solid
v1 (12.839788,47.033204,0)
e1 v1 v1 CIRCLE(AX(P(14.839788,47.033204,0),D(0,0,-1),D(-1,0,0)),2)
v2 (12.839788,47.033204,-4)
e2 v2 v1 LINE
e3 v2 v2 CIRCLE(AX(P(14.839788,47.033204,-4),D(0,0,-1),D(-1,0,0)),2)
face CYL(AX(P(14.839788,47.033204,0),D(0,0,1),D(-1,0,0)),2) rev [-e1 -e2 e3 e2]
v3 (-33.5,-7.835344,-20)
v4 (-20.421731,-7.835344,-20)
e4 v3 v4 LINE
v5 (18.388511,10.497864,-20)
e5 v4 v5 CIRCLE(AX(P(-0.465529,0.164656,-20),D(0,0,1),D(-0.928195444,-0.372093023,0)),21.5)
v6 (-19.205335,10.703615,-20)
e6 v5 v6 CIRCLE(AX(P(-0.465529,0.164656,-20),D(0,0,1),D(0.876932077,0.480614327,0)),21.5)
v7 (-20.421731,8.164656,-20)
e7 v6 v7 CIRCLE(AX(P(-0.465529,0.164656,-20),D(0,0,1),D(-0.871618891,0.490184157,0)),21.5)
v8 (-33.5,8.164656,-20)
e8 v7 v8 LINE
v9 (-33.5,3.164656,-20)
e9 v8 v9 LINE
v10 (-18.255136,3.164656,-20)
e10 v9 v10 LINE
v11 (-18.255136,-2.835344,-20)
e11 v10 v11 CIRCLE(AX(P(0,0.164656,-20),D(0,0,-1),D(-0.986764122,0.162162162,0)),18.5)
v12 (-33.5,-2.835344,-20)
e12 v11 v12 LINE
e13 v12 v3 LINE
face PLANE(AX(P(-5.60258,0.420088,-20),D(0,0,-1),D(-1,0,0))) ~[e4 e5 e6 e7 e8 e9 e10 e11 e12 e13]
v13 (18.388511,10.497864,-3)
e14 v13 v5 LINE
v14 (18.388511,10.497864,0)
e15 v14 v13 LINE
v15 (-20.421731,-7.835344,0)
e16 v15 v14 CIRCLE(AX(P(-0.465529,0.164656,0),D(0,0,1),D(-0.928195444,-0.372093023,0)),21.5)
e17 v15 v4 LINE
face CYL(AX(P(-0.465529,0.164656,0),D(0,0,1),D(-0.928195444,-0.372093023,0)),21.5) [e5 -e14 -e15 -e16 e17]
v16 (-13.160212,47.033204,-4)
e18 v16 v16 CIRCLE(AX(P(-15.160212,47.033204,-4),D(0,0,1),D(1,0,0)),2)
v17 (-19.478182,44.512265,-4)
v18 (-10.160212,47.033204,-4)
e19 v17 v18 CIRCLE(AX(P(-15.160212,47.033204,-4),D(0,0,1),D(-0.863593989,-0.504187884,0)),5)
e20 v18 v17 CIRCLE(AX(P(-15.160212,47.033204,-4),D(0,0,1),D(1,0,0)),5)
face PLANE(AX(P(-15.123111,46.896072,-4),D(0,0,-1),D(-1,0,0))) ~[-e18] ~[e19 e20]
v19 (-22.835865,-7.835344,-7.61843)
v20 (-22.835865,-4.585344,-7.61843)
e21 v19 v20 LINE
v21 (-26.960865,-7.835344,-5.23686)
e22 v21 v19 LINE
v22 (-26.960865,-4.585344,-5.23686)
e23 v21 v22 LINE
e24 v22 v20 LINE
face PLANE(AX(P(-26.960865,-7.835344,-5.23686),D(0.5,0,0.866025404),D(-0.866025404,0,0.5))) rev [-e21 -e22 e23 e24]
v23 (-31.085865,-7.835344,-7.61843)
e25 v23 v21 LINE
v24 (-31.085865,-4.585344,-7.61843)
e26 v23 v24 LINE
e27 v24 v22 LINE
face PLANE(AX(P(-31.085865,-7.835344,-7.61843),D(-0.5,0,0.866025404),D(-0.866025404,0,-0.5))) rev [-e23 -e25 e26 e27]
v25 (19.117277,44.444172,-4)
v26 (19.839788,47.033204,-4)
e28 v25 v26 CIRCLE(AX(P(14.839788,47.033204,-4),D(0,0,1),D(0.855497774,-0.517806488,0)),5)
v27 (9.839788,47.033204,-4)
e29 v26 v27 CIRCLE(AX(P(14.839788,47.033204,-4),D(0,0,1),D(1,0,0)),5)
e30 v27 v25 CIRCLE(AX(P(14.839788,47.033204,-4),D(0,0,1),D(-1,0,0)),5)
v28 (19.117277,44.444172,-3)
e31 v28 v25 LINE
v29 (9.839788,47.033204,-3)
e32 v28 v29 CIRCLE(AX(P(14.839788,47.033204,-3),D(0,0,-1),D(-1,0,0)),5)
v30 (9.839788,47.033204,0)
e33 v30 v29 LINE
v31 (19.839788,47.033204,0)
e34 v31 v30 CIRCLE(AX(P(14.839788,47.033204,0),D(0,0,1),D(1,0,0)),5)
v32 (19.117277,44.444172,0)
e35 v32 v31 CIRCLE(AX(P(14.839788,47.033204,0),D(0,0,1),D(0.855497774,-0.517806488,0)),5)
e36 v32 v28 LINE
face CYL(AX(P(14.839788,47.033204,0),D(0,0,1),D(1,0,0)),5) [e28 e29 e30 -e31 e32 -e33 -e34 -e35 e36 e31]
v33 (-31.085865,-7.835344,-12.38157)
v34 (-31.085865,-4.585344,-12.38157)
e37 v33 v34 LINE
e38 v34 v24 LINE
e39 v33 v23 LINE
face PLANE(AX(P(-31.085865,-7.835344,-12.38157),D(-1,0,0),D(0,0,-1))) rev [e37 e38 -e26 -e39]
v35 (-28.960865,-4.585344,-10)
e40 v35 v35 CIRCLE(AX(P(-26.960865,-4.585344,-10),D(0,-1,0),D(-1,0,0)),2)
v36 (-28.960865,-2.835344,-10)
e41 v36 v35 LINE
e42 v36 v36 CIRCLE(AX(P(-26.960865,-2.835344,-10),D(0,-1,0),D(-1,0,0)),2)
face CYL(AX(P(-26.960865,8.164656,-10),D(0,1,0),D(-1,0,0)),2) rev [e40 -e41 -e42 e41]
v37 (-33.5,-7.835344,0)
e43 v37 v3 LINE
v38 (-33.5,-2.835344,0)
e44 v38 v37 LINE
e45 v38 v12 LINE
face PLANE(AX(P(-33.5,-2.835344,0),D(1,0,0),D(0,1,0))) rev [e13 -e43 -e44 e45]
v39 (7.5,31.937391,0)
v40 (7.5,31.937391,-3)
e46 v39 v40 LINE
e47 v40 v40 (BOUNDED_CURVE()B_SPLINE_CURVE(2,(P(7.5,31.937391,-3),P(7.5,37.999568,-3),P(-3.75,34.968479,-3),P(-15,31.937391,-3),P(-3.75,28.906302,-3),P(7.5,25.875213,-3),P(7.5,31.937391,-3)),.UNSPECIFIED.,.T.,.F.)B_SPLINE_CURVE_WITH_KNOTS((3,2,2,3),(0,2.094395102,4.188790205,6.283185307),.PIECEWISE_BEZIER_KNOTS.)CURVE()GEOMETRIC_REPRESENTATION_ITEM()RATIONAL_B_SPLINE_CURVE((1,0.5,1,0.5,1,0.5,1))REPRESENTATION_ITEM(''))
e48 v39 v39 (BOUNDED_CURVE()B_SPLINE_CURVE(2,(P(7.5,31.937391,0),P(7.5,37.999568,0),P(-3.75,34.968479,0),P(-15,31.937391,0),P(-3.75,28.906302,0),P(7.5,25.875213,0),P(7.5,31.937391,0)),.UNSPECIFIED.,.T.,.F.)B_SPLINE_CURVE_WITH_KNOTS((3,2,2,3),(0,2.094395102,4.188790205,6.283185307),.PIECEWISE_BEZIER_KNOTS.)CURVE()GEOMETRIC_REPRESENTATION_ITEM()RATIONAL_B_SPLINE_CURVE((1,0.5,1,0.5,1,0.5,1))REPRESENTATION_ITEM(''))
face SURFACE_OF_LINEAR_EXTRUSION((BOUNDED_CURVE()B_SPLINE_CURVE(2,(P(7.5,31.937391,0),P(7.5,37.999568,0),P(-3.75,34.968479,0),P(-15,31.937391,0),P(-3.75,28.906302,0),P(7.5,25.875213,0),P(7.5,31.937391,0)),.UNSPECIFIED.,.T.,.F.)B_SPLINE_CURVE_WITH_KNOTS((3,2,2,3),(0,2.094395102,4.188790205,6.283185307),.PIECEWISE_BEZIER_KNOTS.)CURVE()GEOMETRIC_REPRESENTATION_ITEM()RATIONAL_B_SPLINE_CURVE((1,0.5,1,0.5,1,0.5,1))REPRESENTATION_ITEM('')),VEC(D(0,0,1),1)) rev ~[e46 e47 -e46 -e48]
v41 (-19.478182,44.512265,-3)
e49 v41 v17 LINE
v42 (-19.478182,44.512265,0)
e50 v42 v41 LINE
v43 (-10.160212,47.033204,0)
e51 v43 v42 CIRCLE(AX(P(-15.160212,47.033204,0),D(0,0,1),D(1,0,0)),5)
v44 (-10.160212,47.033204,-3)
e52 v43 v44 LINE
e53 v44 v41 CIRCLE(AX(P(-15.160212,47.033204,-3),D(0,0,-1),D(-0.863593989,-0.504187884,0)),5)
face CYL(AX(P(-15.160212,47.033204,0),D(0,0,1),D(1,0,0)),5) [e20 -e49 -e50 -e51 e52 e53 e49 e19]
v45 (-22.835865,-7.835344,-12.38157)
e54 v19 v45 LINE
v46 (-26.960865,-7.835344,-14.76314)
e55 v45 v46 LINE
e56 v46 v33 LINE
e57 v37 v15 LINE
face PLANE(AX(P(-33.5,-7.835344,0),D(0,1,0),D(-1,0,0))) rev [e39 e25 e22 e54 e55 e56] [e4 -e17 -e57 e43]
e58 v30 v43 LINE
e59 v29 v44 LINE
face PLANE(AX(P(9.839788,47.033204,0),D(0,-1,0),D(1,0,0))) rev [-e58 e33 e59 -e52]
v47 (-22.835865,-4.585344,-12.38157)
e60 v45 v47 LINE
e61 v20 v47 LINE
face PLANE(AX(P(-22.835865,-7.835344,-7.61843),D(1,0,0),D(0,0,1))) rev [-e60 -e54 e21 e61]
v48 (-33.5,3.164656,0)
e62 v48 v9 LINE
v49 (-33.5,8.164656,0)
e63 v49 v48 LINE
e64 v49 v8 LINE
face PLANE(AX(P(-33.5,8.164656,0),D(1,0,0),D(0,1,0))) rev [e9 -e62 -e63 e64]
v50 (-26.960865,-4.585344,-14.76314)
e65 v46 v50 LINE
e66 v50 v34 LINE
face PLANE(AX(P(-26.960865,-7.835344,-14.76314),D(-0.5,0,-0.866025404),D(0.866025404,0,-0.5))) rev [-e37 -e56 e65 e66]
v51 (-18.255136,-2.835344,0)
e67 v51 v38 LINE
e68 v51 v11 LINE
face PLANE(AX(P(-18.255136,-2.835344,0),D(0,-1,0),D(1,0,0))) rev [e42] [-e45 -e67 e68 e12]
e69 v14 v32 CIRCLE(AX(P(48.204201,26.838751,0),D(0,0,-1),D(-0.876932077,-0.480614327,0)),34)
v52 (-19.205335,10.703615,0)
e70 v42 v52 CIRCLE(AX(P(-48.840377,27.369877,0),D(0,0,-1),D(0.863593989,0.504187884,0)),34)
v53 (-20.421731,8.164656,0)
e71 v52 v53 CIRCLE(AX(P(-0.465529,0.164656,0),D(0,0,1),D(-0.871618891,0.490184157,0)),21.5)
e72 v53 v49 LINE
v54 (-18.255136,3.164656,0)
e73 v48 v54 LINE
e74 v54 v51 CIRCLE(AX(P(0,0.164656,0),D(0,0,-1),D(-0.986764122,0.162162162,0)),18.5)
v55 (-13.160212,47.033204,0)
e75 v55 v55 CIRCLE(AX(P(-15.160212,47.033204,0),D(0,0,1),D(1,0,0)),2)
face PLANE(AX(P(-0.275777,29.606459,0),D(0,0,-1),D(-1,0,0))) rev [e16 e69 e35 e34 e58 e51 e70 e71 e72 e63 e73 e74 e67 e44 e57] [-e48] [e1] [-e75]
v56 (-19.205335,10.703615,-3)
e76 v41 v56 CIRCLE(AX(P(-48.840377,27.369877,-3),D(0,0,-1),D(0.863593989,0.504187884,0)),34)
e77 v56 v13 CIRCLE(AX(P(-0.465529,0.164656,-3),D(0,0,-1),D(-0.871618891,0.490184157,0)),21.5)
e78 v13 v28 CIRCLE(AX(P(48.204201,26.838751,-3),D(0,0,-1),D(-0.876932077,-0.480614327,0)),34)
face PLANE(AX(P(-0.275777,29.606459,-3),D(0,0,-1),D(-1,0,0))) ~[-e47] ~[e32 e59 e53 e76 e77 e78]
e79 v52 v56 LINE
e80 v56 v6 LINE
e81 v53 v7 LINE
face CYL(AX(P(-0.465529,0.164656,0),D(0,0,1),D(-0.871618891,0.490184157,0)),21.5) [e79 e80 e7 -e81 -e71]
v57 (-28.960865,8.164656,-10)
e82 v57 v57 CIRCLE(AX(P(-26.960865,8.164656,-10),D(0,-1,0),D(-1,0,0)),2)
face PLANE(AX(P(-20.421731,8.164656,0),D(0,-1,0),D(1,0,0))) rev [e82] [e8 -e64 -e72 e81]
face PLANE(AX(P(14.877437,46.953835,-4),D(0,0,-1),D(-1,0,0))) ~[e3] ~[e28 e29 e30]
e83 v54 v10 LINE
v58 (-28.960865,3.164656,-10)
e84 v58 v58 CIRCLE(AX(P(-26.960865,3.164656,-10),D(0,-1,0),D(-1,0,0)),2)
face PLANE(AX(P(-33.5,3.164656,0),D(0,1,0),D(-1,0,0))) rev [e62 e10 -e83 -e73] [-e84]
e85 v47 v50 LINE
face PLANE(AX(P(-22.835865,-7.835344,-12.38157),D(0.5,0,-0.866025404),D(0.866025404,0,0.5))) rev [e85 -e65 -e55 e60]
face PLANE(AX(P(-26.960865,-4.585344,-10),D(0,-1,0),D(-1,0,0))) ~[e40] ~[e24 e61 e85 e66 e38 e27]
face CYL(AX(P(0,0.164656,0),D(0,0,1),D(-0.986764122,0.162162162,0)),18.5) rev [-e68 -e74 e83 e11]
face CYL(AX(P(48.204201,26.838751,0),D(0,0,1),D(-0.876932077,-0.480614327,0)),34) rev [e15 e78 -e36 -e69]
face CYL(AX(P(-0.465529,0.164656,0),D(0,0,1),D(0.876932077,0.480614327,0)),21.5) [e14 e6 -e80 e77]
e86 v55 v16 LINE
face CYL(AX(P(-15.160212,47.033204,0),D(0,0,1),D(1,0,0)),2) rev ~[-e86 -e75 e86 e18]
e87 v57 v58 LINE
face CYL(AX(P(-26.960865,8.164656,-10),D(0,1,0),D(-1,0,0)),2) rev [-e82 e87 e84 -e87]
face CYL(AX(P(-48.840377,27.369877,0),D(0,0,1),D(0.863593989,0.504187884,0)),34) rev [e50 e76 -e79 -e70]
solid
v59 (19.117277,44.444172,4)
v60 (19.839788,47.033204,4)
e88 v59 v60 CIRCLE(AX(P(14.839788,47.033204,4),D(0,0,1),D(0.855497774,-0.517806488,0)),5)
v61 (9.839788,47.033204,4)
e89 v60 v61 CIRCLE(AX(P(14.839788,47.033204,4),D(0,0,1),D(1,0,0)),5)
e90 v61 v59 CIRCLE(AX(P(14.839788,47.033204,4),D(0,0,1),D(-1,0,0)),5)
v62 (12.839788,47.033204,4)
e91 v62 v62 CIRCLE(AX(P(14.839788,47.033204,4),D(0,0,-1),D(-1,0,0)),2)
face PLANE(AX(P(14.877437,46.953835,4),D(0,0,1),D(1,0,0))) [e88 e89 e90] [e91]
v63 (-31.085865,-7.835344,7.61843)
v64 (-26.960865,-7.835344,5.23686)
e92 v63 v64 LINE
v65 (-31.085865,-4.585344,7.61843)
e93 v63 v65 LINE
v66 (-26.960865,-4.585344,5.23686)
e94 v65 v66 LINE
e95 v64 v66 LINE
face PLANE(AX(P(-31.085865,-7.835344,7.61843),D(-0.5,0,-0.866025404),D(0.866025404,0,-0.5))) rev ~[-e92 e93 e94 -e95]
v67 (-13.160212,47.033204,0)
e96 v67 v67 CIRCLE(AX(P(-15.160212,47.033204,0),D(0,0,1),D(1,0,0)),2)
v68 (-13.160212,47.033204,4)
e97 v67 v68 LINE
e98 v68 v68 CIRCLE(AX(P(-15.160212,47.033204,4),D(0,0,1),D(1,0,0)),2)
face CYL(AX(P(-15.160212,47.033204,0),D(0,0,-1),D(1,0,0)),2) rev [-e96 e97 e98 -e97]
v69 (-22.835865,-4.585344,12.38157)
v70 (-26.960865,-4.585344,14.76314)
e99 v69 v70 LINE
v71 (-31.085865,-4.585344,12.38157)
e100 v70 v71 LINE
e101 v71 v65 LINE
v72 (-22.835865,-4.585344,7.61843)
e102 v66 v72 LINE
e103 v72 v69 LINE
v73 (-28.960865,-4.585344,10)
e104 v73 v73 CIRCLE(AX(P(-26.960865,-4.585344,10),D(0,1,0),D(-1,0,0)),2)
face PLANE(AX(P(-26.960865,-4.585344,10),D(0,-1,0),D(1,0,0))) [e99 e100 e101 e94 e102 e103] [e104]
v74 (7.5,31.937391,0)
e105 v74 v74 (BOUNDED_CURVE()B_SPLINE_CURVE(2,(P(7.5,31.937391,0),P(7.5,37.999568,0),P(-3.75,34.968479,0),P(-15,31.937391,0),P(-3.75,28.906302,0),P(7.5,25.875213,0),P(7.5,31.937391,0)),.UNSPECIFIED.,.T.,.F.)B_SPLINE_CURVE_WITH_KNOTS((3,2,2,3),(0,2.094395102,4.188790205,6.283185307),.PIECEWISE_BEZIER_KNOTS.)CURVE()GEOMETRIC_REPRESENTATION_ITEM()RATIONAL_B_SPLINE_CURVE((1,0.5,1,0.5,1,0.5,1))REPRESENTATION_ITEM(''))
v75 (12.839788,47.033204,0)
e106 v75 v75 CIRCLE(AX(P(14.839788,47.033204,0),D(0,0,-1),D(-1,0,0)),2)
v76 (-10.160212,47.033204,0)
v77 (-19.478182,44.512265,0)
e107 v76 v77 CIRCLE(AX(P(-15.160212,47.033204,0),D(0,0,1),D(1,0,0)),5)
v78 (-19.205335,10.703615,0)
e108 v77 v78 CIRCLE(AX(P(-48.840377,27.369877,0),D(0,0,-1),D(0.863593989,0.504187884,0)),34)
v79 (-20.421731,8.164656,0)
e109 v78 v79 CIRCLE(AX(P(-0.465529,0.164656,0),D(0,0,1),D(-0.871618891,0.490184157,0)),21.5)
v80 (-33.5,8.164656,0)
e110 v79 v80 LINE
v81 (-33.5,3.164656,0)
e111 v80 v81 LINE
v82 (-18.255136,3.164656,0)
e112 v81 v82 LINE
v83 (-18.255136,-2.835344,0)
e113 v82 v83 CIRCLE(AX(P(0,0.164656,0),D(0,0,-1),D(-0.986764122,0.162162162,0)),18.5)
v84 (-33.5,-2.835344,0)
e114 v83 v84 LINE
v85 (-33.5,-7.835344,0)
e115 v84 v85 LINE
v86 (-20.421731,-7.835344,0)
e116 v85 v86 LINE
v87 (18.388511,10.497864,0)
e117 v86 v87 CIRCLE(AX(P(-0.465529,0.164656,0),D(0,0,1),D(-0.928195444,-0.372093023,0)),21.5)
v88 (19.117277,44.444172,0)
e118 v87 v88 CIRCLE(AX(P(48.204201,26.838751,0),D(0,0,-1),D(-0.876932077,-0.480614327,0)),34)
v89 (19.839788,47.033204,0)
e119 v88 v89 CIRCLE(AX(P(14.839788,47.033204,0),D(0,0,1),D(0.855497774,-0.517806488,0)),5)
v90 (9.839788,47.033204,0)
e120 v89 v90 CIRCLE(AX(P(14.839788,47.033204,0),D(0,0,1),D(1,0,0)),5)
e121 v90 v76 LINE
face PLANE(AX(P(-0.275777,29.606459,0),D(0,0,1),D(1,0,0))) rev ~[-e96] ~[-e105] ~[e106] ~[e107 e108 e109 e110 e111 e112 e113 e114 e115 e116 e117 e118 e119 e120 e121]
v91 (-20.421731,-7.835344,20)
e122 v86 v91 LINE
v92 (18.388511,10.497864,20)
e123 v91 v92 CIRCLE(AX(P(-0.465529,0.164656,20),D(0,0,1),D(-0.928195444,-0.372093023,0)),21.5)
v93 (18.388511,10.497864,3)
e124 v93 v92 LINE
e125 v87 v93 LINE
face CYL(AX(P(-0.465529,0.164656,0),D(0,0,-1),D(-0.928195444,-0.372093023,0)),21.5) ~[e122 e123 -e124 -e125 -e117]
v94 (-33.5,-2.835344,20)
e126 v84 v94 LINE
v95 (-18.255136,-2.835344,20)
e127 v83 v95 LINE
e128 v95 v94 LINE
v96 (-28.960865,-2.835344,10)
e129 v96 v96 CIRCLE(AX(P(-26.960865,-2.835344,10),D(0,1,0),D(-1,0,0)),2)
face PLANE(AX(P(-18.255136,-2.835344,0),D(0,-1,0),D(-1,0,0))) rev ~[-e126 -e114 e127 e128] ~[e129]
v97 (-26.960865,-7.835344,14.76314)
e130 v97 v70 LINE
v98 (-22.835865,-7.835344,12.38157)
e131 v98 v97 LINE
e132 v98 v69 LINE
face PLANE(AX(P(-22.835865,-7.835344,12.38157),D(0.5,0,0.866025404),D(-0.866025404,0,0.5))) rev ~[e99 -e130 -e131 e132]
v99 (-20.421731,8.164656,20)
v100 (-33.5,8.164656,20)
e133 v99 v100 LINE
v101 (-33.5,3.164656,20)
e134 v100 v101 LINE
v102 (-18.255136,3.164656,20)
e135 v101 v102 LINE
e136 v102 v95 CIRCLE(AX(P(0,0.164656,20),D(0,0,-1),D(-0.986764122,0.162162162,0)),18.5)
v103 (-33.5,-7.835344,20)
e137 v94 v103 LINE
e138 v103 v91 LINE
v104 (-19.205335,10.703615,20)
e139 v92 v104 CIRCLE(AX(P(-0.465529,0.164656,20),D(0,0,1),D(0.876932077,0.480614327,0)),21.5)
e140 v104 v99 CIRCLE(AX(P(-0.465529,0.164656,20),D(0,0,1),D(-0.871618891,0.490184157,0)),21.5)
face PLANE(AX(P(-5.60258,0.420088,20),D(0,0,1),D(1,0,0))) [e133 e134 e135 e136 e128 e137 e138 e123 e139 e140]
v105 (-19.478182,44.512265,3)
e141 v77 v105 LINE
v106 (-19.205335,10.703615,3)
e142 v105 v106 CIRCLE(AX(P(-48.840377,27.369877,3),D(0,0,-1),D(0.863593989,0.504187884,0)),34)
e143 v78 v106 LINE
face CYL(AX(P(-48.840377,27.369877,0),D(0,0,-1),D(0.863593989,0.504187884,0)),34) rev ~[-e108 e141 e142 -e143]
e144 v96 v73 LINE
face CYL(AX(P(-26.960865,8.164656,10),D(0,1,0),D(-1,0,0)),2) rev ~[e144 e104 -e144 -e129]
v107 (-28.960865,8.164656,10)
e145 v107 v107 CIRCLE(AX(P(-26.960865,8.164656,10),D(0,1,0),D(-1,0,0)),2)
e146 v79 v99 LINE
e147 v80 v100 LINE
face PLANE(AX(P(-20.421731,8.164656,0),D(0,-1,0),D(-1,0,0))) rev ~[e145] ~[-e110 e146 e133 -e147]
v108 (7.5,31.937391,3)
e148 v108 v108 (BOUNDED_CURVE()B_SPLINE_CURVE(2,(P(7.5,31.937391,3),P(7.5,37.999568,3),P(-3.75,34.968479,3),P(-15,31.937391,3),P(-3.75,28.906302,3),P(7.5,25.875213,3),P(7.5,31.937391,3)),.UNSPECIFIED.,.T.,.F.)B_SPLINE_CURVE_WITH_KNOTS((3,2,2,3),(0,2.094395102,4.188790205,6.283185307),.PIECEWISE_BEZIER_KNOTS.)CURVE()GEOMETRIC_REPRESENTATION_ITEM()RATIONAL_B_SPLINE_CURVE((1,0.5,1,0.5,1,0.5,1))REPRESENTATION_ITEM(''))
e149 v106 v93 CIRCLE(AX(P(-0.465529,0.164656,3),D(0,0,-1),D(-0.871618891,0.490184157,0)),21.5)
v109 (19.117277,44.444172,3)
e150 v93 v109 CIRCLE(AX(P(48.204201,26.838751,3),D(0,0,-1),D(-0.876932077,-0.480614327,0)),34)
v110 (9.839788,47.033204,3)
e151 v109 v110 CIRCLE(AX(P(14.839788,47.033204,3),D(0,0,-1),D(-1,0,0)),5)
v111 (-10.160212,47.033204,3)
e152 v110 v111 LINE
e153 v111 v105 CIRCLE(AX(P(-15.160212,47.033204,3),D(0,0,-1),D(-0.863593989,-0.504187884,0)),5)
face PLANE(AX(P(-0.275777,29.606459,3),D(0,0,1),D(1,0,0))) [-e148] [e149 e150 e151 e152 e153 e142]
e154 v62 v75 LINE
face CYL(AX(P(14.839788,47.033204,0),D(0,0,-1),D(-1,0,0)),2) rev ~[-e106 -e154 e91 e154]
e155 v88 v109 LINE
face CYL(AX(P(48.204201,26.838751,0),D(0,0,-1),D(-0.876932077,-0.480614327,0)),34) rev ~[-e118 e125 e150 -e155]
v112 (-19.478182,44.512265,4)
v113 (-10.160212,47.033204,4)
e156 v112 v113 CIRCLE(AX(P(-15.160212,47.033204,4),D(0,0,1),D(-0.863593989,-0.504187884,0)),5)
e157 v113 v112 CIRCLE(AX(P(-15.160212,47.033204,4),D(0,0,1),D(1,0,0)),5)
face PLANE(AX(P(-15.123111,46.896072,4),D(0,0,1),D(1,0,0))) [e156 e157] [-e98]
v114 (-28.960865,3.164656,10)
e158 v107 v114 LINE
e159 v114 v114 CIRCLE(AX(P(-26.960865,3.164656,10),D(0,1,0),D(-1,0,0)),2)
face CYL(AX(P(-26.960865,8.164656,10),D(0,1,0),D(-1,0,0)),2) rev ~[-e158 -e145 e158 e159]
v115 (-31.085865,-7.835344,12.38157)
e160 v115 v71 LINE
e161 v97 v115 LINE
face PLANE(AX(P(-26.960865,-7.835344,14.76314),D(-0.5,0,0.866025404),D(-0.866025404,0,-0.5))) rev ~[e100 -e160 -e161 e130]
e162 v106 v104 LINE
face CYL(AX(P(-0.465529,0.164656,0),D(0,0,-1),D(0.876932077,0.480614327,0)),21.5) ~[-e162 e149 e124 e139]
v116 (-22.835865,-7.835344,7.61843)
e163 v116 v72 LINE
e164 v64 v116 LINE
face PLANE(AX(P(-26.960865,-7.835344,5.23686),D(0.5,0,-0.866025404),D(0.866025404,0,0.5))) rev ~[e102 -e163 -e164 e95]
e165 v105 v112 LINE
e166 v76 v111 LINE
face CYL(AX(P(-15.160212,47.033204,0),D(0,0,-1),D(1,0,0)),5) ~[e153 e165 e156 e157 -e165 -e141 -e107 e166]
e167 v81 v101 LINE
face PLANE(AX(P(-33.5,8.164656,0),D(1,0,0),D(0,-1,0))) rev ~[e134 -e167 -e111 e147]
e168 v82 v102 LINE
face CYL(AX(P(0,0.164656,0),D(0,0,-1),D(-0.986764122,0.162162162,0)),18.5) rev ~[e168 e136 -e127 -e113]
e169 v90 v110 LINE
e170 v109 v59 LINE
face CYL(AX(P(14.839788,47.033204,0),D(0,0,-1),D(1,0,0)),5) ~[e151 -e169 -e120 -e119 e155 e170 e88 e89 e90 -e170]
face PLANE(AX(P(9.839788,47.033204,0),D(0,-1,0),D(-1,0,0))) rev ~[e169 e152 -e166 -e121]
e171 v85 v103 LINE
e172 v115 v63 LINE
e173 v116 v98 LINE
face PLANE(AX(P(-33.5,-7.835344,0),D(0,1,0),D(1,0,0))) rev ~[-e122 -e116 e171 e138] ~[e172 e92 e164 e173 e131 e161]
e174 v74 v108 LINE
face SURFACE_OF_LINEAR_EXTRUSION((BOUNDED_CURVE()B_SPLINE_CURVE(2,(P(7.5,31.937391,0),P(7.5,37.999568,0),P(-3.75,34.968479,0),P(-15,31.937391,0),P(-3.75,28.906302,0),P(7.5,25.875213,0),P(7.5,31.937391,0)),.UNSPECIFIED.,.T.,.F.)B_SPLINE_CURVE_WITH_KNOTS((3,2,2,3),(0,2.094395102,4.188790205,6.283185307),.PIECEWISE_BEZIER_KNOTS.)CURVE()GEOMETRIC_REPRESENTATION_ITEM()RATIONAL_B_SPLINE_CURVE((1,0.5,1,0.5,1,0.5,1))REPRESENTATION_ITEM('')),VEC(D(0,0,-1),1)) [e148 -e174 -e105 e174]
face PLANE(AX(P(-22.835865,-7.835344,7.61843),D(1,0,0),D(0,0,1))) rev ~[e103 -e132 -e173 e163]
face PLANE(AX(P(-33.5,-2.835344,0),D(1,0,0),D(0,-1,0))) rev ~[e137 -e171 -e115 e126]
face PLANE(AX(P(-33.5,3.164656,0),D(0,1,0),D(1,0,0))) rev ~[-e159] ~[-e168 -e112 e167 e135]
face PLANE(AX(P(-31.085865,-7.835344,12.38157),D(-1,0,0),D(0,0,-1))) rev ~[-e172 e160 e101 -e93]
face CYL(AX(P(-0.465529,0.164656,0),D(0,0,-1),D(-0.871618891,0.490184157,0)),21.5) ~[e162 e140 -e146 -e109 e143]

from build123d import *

# Parameters (mm, degrees)
F1_DEPTH = 20
F0_R     = 2
F2_DEPTH = 3
F3_DEPTH = 4
F5_DEPTH = 3.25
F6_R     = 2
F7_DEPTH = 29.5010001


# Not quite as in the source:
# - a feature names something its author has since deleted; it is built from what else it names


with BuildPart() as f1:
    # F0 (on Top) → F1 (new body)
    with BuildSketch(Plane.XY):
        with BuildLine():
            ThreePointArc((-18.2551362635, 3.1646558729), (18.5, 0.1646558729), (-18.2551362635, -2.8353441271))
            Line((-18.2551362635, -2.8353441271), (-21.289668856, -2.8353441271))
            Line((-21.289668856, -2.8353441271), (-33.5, -2.8353441271))
            Line((-33.5, -2.8353441271), (-33.5, -5.8353441271))
            Line((-33.5, -5.8353441271), (-33.5, -7.8353441271))
            Line((-33.5, -7.8353441271), (-20.4217309456, -7.8353441271))
            ThreePointArc((-20.4217309456, -7.8353441271), (8.7176252261, -19.2755005117), (18.3885107603, 10.4978639134))
            ThreePointArc((18.3885107603, 10.4978639134), (-0.3478610365, 21.6643338769), (-19.2053350681, 10.7036152553))
            ThreePointArc((-19.2053350681, 10.7036152553), (-19.8551354356, 9.4540669672), (-20.4217309456, 8.1646558729))
            Line((-20.4217309456, 8.1646558729), (-33.5, 8.1646558729))
            Line((-33.5, 8.1646558729), (-33.5, 6.1646558729))
            Line((-33.5, 6.1646558729), (-33.5, 3.1646558729))
            Line((-33.5, 3.1646558729), (-21.289668856, 3.1646558729))
            Line((-21.289668856, 3.1646558729), (-18.2551362635, 3.1646558729))
        make_face()
    extrude(amount=F1_DEPTH)

    # F0 (on Top) → F2 (join)
    with BuildSketch(Plane.XY):
        with BuildLine():
            ThreePointArc((-19.2053350681, 10.7036152553), (-0.3478610365, 21.6643338769), (18.3885107603, 10.4978639134))
            ThreePointArc((18.3885107603, 10.4978639134), (14.2120337074, 27.5685018888), (19.1172770705, 44.4441716239))
            ThreePointArc((19.1172770705, 44.4441716239), (13.4958098431, 42.2172179553), (9.8397882001, 47.0332040616))
            Line((9.8397882001, 47.0332040616), (-10.1602117999, 47.0332040616))
            ThreePointArc((-10.1602117999, 47.0332040616), (-13.8544265436, 42.2067224379), (-19.4781817457, 44.512264644))
            ThreePointArc((-19.4781817457, 44.512264644), (-14.8414845345, 27.6442586076), (-19.2053350681, 10.7036152553))
        make_face()
        with BuildLine():
            add(Edge.make_bspline(
                [(7.5, 31.9373905659), (7.5, 37.9995683924), (-3.75, 34.9684794791), (-15, 31.9373905659), (-3.75, 28.9063016526), (7.5, 25.8752127394), (7.5, 31.9373905659)],
                knots=[0, 0, 0, 2.0943951024, 2.0943951024, 4.1887902048, 4.1887902048, 6.2831853072, 6.2831853072, 6.2831853072], degree=2, weights=[1, 0.5, 1, 0.5, 1, 0.5, 1]))
        make_face(mode=Mode.SUBTRACT)
        with BuildLine():
            ThreePointArc((-10.1602117999, 47.0332040616), (-16.4659970562, 51.8596856854), (-19.4781817457, 44.512264644))
            ThreePointArc((-19.4781817457, 44.512264644), (-13.8544265436, 42.2067224379), (-10.1602117999, 47.0332040616))
        make_face()
        with Locations((-15.1602117999, 47.0332040616)):
            Circle(F0_R, mode=Mode.SUBTRACT)
        with BuildLine():
            ThreePointArc((9.8397882001, 47.0332040616), (13.4958098431, 42.2172179553), (19.1172770705, 44.4441716239))
            ThreePointArc((19.1172770705, 44.4441716239), (19.6557743064, 45.6892257046), (19.8397882001, 47.0332040616))
            ThreePointArc((19.8397882001, 47.0332040616), (14.8397882001, 52.0332040616), (9.8397882001, 47.0332040616))
        make_face()
        with BuildLine():
            ThreePointArc((16.8397882001, 47.0332040616), (14.8397882001, 45.0332040616), (12.8397882001, 47.0332040616))
            ThreePointArc((12.8397882001, 47.0332040616), (14.8397882001, 49.0332040616), (16.8397882001, 47.0332040616))
        make_face(mode=Mode.SUBTRACT)
    extrude(amount=F2_DEPTH)

    # F0 (on Top) → F3 (join)
    with BuildSketch(Plane.XY):
        with BuildLine():
            ThreePointArc((-10.1602117999, 47.0332040616), (-16.4659970562, 51.8596856854), (-19.4781817457, 44.512264644))
            ThreePointArc((-19.4781817457, 44.512264644), (-13.8544265436, 42.2067224379), (-10.1602117999, 47.0332040616))
        make_face()
        with Locations((-15.1602117999, 47.0332040616)):
            Circle(F0_R, mode=Mode.SUBTRACT)
        with BuildLine():
            ThreePointArc((9.8397882001, 47.0332040616), (13.4958098431, 42.2172179553), (19.1172770705, 44.4441716239))
            ThreePointArc((19.1172770705, 44.4441716239), (19.6557743064, 45.6892257046), (19.8397882001, 47.0332040616))
            ThreePointArc((19.8397882001, 47.0332040616), (14.8397882001, 52.0332040616), (9.8397882001, 47.0332040616))
        make_face()
        with BuildLine():
            ThreePointArc((16.8397882001, 47.0332040616), (14.8397882001, 45.0332040616), (12.8397882001, 47.0332040616))
            ThreePointArc((12.8397882001, 47.0332040616), (14.8397882001, 49.0332040616), (16.8397882001, 47.0332040616))
        make_face(mode=Mode.SUBTRACT)
    extrude(amount=F3_DEPTH)

    # F4 (on face) → F5 (cut)
    with BuildSketch(Plane.XZ.offset(7.8353441271)):
        Polygon((-31.0858654728, 12.3815698604), (-31.0858654728, 7.6184301396), (-26.9608654728, 5.2368602792), (-22.8358654728, 7.6184301396), (-22.8358654728, 12.3815698604), (-26.9608654728, 14.7631397208), align=None)
    extrude(amount=-F5_DEPTH, mode=Mode.SUBTRACT)

    # F6 (on face) → F7 (cut, through all)
    with BuildSketch(Plane(origin=(0, 8.1646558729, 0), x_dir=(-1, 0, 0), z_dir=(0, 1, 0))):
        with Locations((26.9608654728, 10)):
            Circle(F6_R)
    extrude(amount=-F7_DEPTH, mode=Mode.SUBTRACT)


with BuildPart() as f8_1:
    # F8: instance of F1
    add(f1.part.mirror(Plane.XY))


solid = Compound([f1.part, f8_1.part])
